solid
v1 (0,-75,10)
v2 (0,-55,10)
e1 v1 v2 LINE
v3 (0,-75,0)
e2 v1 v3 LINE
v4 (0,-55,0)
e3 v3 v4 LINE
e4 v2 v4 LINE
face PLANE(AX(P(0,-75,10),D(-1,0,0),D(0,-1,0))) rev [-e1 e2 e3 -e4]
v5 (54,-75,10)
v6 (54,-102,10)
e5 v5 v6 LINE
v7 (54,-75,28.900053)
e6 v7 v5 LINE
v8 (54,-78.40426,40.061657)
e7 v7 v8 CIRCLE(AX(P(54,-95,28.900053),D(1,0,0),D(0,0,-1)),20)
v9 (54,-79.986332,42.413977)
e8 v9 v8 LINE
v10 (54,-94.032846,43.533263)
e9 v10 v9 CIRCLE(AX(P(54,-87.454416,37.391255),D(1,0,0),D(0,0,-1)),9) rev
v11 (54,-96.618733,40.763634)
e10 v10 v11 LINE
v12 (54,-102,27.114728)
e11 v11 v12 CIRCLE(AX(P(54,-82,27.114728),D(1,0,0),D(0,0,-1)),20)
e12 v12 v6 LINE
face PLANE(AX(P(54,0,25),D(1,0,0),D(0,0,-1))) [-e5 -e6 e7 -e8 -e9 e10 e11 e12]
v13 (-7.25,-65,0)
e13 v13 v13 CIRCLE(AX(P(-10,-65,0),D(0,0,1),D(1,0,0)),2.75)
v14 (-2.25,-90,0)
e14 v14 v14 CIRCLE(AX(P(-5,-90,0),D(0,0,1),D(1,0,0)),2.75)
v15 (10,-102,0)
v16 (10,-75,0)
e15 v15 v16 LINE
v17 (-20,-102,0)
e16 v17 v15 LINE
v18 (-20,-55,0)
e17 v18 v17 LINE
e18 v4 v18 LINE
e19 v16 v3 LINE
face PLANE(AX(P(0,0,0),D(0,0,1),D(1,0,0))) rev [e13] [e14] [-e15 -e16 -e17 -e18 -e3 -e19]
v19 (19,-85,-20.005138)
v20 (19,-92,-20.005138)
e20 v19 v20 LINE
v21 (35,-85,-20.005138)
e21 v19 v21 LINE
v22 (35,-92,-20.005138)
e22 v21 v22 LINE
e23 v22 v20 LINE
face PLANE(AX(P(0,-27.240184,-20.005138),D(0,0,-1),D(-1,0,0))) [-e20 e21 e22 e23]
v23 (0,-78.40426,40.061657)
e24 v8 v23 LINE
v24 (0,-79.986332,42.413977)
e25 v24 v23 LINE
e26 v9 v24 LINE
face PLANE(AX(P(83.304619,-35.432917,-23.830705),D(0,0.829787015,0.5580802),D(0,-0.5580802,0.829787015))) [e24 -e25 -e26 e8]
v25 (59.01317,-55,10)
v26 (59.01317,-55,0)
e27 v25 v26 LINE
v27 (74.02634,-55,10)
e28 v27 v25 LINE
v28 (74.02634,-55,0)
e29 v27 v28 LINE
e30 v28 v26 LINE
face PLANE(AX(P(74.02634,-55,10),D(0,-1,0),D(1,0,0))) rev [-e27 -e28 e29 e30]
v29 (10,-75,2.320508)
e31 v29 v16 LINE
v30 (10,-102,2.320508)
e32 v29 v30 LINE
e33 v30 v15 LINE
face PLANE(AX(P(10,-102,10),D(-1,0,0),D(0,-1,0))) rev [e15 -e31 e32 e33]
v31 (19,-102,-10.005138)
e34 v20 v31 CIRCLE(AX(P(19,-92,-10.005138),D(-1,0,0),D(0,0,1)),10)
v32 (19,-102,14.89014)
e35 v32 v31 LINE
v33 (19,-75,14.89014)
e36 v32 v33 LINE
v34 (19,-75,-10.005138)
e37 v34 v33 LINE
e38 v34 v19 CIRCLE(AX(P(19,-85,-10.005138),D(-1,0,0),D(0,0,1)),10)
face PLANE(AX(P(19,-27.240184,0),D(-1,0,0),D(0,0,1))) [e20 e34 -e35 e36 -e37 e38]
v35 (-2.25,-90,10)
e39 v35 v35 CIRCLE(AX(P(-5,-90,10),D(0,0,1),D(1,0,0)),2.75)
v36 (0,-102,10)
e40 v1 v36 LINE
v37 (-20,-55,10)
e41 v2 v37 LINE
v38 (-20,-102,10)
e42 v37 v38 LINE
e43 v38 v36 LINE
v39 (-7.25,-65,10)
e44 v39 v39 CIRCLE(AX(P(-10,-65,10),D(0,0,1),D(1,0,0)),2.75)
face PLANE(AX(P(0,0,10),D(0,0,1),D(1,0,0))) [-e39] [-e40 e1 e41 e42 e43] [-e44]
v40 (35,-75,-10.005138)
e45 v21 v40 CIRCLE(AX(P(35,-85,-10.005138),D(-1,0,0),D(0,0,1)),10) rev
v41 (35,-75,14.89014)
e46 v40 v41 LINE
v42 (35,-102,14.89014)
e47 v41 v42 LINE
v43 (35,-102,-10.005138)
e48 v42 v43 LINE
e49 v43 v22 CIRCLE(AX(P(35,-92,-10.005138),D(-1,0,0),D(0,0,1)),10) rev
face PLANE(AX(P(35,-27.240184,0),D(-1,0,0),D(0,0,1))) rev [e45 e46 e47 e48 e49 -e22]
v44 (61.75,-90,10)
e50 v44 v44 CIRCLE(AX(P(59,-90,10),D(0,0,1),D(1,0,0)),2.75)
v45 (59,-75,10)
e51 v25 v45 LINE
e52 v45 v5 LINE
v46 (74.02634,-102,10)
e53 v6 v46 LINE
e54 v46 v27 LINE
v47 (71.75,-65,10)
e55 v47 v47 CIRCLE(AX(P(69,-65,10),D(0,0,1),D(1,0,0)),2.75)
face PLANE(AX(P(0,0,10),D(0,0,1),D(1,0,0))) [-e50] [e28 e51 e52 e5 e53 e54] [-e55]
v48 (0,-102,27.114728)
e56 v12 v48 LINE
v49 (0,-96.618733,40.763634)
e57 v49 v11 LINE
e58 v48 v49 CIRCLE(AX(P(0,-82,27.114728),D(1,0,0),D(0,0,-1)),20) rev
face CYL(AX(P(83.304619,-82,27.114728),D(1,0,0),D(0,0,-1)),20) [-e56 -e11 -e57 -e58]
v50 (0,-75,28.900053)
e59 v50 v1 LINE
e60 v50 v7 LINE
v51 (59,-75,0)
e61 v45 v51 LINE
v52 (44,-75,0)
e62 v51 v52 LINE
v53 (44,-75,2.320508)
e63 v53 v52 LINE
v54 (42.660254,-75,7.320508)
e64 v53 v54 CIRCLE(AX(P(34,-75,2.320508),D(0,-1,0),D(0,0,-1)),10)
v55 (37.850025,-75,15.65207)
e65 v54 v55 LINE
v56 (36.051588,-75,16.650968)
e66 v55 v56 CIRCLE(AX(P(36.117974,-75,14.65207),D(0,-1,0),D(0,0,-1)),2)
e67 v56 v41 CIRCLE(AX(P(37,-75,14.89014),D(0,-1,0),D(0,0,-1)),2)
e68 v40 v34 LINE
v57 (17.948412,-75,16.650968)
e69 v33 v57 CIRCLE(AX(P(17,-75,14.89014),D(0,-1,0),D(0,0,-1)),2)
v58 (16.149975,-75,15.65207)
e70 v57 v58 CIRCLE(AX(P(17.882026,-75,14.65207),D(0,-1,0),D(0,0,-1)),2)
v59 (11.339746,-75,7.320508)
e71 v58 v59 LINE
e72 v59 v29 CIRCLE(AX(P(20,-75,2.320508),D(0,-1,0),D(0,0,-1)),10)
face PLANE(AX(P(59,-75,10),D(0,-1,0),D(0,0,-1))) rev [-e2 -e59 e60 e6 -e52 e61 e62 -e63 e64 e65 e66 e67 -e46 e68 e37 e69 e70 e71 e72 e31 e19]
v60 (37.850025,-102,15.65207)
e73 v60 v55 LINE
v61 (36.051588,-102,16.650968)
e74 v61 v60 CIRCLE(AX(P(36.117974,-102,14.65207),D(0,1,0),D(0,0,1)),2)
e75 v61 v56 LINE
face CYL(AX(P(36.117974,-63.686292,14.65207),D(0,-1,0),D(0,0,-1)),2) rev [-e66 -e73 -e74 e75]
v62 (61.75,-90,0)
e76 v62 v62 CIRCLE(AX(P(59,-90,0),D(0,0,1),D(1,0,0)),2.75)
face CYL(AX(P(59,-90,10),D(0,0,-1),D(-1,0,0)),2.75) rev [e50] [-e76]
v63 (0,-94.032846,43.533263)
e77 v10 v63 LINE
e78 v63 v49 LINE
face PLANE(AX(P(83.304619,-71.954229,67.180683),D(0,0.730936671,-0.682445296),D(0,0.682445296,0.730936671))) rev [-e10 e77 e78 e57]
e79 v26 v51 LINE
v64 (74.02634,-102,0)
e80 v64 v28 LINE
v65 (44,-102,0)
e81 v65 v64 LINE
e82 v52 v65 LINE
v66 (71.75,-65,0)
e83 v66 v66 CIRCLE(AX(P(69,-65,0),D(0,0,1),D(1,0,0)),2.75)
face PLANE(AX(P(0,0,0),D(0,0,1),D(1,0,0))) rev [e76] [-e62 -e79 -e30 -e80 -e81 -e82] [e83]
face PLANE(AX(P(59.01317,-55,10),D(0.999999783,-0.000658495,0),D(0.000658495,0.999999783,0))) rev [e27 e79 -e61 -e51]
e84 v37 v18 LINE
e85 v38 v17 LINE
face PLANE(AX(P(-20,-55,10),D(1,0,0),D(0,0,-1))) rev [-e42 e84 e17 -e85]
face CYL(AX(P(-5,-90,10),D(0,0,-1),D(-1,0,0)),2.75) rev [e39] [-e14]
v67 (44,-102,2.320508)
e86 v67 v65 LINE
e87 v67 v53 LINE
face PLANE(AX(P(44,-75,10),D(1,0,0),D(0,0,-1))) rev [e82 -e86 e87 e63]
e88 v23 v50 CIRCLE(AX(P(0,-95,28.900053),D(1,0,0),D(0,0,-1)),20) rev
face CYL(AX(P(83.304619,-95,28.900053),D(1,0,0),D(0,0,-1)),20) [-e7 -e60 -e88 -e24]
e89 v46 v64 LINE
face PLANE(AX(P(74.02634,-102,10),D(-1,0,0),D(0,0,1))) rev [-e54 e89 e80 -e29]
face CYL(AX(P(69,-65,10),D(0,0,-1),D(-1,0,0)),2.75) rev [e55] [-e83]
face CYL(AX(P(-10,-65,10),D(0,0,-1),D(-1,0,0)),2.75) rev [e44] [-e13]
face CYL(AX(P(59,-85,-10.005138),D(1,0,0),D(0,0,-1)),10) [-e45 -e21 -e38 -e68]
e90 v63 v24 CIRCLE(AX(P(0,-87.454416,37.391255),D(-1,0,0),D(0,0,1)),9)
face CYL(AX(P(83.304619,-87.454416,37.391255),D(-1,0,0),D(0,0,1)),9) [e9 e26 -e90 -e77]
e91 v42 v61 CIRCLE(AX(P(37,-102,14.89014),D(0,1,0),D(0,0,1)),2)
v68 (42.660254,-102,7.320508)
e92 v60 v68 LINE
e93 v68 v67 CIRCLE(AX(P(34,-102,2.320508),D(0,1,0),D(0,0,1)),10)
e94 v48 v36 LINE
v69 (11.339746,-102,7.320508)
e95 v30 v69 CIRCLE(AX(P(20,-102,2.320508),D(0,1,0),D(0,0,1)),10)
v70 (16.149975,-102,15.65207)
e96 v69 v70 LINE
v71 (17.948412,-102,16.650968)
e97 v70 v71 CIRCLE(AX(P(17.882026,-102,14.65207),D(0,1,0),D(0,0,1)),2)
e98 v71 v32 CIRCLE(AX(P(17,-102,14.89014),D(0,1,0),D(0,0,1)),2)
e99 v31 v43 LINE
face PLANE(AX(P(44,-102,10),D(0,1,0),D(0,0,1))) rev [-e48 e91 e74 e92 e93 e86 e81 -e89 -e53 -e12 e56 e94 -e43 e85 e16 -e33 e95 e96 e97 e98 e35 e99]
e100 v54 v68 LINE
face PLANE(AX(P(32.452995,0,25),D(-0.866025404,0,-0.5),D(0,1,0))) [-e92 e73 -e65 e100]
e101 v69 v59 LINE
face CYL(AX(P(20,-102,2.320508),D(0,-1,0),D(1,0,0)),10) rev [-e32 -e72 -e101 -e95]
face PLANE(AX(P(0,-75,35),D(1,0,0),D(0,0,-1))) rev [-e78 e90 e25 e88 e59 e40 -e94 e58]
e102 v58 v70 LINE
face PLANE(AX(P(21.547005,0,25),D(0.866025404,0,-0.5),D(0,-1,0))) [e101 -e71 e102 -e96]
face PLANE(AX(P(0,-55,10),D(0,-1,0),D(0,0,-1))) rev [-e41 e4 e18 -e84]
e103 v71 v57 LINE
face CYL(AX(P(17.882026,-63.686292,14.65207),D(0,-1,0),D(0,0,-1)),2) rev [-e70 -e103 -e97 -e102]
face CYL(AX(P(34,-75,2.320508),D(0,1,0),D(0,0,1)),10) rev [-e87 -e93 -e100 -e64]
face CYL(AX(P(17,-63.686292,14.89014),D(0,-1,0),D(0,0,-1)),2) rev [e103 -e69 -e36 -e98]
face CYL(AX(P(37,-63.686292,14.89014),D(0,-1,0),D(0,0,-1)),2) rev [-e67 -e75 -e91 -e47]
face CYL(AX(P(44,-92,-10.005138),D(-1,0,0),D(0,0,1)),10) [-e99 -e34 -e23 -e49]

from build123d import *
from OCP.BRepFilletAPI import BRepFilletAPI_MakeChamfer

# Parameters (mm, degrees)
SKETCH2_R             = 2.75
BOSS_EXTRUDE1_DEPTH   = 10
BOSS_EXTRUDE1_2_DEPTH = 10
SKETCH3_W             = 10
SKETCH3_H             = 27
BOSS_EXTRUDE2_DEPTH   = 15
SKETCH4_W             = 54
SKETCH4_H             = 27
BOSS_EXTRUDE3_DEPTH   = 10
CHAMFER1_SIZE         = 20
CHAMFER1_SIZE2        = 11.547005384
FILLET1_R             = 10
BOSS_EXTRUDE4_DEPTH   = 54
FILLET2_R             = 20
BOSS_EXTRUDE5_DEPTH   = 27
FILLET3_R             = 10
SKETCH7_R             = 4
BOSS_EXTRUDE6_DEPTH   = 27
FILLET4_R             = 2


with BuildPart() as part:
    # Sketch2 → Boss-Extrude1 (new body)
    with BuildSketch(Plane.XY):
        Polygon((44, -75), (44, -102), (74.026339821, -102), (74.026339821, -55), (59.01316991, -55), (59, -75), align=None)
        with Locations((59, -90)):
            Circle(SKETCH2_R, mode=Mode.SUBTRACT)
        with Locations((69, -65)):
            Circle(SKETCH2_R, mode=Mode.SUBTRACT)
    extrude(amount=BOSS_EXTRUDE1_DEPTH)



with BuildPart() as body_2:
    # Sketch2 → Boss-Extrude1 2 (new body)
    with BuildSketch(Plane.XY):
        Polygon((-20, -55), (-20, -102), (10, -102), (10, -75), (0, -75), (0, -55), align=None)
        with Locations((-10, -65)):
            Circle(SKETCH2_R, mode=Mode.SUBTRACT)
        with Locations((-5, -90)):
            Circle(SKETCH2_R, mode=Mode.SUBTRACT)
    extrude(amount=BOSS_EXTRUDE1_2_DEPTH)


with BuildPart() as part_1:
    add(part.part)

    add(body_2.part)  # Boss-Extrude2 merges body 2
    # Sketch3 → Boss-Extrude2 (add)
    with BuildSketch(Plane.XY.offset(10)):
        with Locations((5, -88.5)):
            Rectangle(SKETCH3_W, SKETCH3_H)
        with Locations((49, -88.5)):
            Rectangle(SKETCH3_W, SKETCH3_H)
    extrude(amount=BOSS_EXTRUDE2_DEPTH)

    # Sketch4 → Boss-Extrude3 (add)
    with BuildSketch(Plane.XY.offset(25)):
        with Locations((27, -88.5)):
            Rectangle(SKETCH4_W, SKETCH4_H)
    extrude(amount=BOSS_EXTRUDE3_DEPTH)

    # Chamfer1: one chamfer whose edges measure the first distance from different faces: ONE call of the kernel's chamfer builder (chamfer() names one face for all edges)
    chamfer1_edges_1 = [part_1.edges().sort_by_distance(p)[0] for p in [
        (44, -88.5, 25),
    ]]
    chamfer1_side_1 = [part_1.faces().sort_by_distance(p)[0] for p in [
        (44, -88.5, 12.5),
    ]]
    chamfer1_edges_2 = [part_1.edges().sort_by_distance(p)[0] for p in [
        (10, -88.5, 25),
    ]]
    chamfer1_side_2 = [part_1.faces().sort_by_distance(p)[0] for p in [
        (10, -88.5, 12.5),
    ]]
    chamfer1 = BRepFilletAPI_MakeChamfer(part_1.part.solid().wrapped)
    for e in chamfer1_edges_1:
        chamfer1.Add(CHAMFER1_SIZE, CHAMFER1_SIZE2, e.wrapped, chamfer1_side_1[0].wrapped)  # the first distance lies on this face
    for e in chamfer1_edges_2:
        chamfer1.Add(CHAMFER1_SIZE, CHAMFER1_SIZE2, e.wrapped, chamfer1_side_2[0].wrapped)  # the first distance lies on this face
    add(Compound.cast(chamfer1.Shape()), mode=Mode.REPLACE)

    # Fillet1
    # the kernel refuses this fillet: 10 mm, written as the material it adds along each edge
    with BuildSketch(Plane(origin=(44, -102, 5), x_dir=(0, 0, -1), z_dir=(0, 1, 0))) as fillet1_piece_1:
        with BuildLine():
            CenterArc((FILLET1_R * 0.267949192431, FILLET1_R), FILLET1_R, 240, 30)
            Line((-FILLET1_R * 0.232050807569, FILLET1_R * 0.133974596216), (0, 0))
            Line((0, 0), (FILLET1_R * 0.267949192431, 0))
        make_face()
    extrude(amount=27)
    with BuildSketch(Plane(origin=(10, -102, 5), x_dir=(0, 0, -1), z_dir=(0, 1, 0))) as fillet1_piece_2:
        with BuildLine():
            CenterArc((FILLET1_R * 0.267949192431, -FILLET1_R), FILLET1_R, 90, 30)
            Line((-FILLET1_R * 0.232050807569, -FILLET1_R * 0.133974596216), (0, 0))
            Line((0, 0), (FILLET1_R * 0.267949192431, 0))
        make_face()
    extrude(amount=27)
    with BuildSketch(Plane(origin=(21.547005384, -102, 25), x_dir=(-0.500000000000001, 0, -0.866025403784438), z_dir=(0, 1, 0))) as fillet1_piece_3:
        with BuildLine():
            CenterArc((FILLET1_R * 0.57735026919, -FILLET1_R), FILLET1_R, 90, 60)
            Line((-FILLET1_R * 0.288675134595, -FILLET1_R * 0.5), (0, 0))
            Line((0, 0), (FILLET1_R * 0.57735026919, 0))
        make_face()
    extrude(amount=27)
    with BuildSketch(Plane(origin=(32.452994616, -102, 25), x_dir=(0.5000000000000013, 0, -0.866025403784438), z_dir=(0, 1, 0))) as fillet1_piece_4:
        with BuildLine():
            CenterArc((FILLET1_R * 0.57735026919, FILLET1_R), FILLET1_R, 210, 60)
            Line((-FILLET1_R * 0.288675134595, FILLET1_R * 0.5), (0, 0))
            Line((0, 0), (FILLET1_R * 0.57735026919, 0))
        make_face()
    extrude(amount=27)

    # Sketch5 → Boss-Extrude4 (add)
    with BuildSketch(Plane.ZY):
        with BuildLine():
            ThreePointArc((35, -78.77790147), (38.839091833, -78.571636186), (42.413977278, -79.986332451))
            Line((42.413977278, -79.986332451), (35, -75))
            Line((35, -75), (35, -78.77790147))
        make_face()
        with BuildLine():
            ThreePointArc((35, -96.130929705), (39.540098119, -96.194122408), (43.533263146, -94.032845631))
            ThreePointArc((43.533263146, -94.032845631), (45.645892631, -91.040634418), (46.39125548, -87.454415588))
            ThreePointArc((46.39125548, -87.454415588), (45.334947826, -83.223842115), (42.413977278, -79.986332451))
            ThreePointArc((42.413977278, -79.986332451), (38.839091833, -78.571636186), (35, -78.77790147))
            Line((35, -78.77790147), (35, -96.130929705))
        make_face()
        with BuildLine():
            ThreePointArc((35, -78.77790147), (28.39125548, -87.454415588), (35, -96.130929705))
            Line((35, -96.130929705), (35, -78.77790147))
        make_face()
        with BuildLine():
            Line((35, -102), (43.533263146, -94.032845631))
            ThreePointArc((43.533263146, -94.032845631), (39.540098119, -96.194122408), (35, -96.130929705))
            Line((35, -96.130929705), (35, -102))
        make_face()
    extrude(amount=-BOSS_EXTRUDE4_DEPTH)

    # Fillet2
    fillet2_edges = [part_1.edges().sort_by_distance(p)[0] for p in [
        (27, -102, 35),
        (27, -75, 35),
    ]]
    fillet(fillet2_edges, radius=FILLET2_R)

    # Sketch6 → Boss-Extrude5 (add)
    with BuildSketch(Plane.XZ.offset(102)):
        with BuildLine():
            Line((27, -20.005137591), (27, 24.994862409))
            ThreePointArc((27, 24.994862409), (22.461220804, 23.739984394), (19, 20.546994264))
            Line((19, 20.546994264), (19, -20.005137591))
            Line((19, -20.005137591), (27, -20.005137591))
        make_face()
        with BuildLine():
            ThreePointArc((35, 20.546994264), (31.538779196, 23.739984394), (27, 24.994862409))
            Line((27, 24.994862409), (27, -20.005137591))
            Line((27, -20.005137591), (35, -20.005137591))
            Line((35, -20.005137591), (35, 20.546994264))
        make_face()
    extrude(amount=-BOSS_EXTRUDE5_DEPTH)

    # Fillet3
    fillet3_edges = [part_1.edges().sort_by_distance(p)[0] for p in [
        (27, -102, -20.005137591),
        (27, -75, -20.005137591),
    ]]
    fillet(fillet3_edges, radius=FILLET3_R)

    # Sketch7 → Boss-Extrude6 (add)
    with BuildSketch(Plane.XZ.offset(102)):
        with Locations((35, 20.546994264)):
            Circle(SKETCH7_R)
        with Locations((19, 20.546994264)):
            Circle(SKETCH7_R)
    extrude(amount=-BOSS_EXTRUDE6_DEPTH)

    # Fillet4
    # the kernel refuses this fillet: 2 mm, written as the material it adds along each edge
    with BuildSketch(Plane(origin=(19, -75, 16.546994264), x_dir=(-0.9855985596534884, 0, 0.16910197872576482), z_dir=(0, -1, 0))) as fillet4_piece_1:
        with BuildLine():
            CenterArc((1.691019787, 1.971197119), FILLET4_R, 189.735610317, 70.528779366)
            Line((-0.280177332, 1.632993162), (0, 0))
            ThreePointArc((0, 0), (0.676407915, 0.057605761), (1.35281583, 0))
        make_face()
    extrude(amount=27)
    with BuildSketch(Plane(origin=(16.982072855, -75, 17.093304927), x_dir=(0.9365633993502674, 0, -0.35049821539841175), z_dir=(0, -1, 0))) as fillet4_piece_2:
        with BuildLine():
            CenterArc((1.698511894, -1.970939444), FILLET4_R, 99.779167009, 70.738624206)
            Line((-0.274161714, -1.641456762), (0, 0))
            ThreePointArc((0, 0), (0.679404758, -0.058121111), (1.358809515, 0))
        make_face()
    extrude(amount=27)
    with BuildSketch(Plane(origin=(37.017927145, -75, 17.093304927), x_dir=(0.5000000000000021, 0, -0.8660254037844376), z_dir=(0, -1, 0))) as fillet4_piece_3:
        with BuildLine():
            CenterArc((1.664194985, -2), FILLET4_R, 90, 70.738624206)
            ThreePointArc((-0.223852102, -1.340243834), (-0.05459906, -0.679696867), (0, 0))
            Line((0, 0), (1.664194985, 0))
        make_face()
    extrude(amount=27)
    with BuildSketch(Plane(origin=(35, -75, 16.546994264), x_dir=(0, 0, -1), z_dir=(0, -1, 0))) as fillet4_piece_4:
        with BuildLine():
            CenterArc((1.656854249, 2), FILLET4_R, 199.471220634, 70.528779366)
            ThreePointArc((-0.228763834, 1.333333333), (-0.057605761, 0.676407915), (0, 0))
            Line((0, 0), (1.656854249, 0))
        make_face()
    extrude(amount=27)


solid = part_1.part
